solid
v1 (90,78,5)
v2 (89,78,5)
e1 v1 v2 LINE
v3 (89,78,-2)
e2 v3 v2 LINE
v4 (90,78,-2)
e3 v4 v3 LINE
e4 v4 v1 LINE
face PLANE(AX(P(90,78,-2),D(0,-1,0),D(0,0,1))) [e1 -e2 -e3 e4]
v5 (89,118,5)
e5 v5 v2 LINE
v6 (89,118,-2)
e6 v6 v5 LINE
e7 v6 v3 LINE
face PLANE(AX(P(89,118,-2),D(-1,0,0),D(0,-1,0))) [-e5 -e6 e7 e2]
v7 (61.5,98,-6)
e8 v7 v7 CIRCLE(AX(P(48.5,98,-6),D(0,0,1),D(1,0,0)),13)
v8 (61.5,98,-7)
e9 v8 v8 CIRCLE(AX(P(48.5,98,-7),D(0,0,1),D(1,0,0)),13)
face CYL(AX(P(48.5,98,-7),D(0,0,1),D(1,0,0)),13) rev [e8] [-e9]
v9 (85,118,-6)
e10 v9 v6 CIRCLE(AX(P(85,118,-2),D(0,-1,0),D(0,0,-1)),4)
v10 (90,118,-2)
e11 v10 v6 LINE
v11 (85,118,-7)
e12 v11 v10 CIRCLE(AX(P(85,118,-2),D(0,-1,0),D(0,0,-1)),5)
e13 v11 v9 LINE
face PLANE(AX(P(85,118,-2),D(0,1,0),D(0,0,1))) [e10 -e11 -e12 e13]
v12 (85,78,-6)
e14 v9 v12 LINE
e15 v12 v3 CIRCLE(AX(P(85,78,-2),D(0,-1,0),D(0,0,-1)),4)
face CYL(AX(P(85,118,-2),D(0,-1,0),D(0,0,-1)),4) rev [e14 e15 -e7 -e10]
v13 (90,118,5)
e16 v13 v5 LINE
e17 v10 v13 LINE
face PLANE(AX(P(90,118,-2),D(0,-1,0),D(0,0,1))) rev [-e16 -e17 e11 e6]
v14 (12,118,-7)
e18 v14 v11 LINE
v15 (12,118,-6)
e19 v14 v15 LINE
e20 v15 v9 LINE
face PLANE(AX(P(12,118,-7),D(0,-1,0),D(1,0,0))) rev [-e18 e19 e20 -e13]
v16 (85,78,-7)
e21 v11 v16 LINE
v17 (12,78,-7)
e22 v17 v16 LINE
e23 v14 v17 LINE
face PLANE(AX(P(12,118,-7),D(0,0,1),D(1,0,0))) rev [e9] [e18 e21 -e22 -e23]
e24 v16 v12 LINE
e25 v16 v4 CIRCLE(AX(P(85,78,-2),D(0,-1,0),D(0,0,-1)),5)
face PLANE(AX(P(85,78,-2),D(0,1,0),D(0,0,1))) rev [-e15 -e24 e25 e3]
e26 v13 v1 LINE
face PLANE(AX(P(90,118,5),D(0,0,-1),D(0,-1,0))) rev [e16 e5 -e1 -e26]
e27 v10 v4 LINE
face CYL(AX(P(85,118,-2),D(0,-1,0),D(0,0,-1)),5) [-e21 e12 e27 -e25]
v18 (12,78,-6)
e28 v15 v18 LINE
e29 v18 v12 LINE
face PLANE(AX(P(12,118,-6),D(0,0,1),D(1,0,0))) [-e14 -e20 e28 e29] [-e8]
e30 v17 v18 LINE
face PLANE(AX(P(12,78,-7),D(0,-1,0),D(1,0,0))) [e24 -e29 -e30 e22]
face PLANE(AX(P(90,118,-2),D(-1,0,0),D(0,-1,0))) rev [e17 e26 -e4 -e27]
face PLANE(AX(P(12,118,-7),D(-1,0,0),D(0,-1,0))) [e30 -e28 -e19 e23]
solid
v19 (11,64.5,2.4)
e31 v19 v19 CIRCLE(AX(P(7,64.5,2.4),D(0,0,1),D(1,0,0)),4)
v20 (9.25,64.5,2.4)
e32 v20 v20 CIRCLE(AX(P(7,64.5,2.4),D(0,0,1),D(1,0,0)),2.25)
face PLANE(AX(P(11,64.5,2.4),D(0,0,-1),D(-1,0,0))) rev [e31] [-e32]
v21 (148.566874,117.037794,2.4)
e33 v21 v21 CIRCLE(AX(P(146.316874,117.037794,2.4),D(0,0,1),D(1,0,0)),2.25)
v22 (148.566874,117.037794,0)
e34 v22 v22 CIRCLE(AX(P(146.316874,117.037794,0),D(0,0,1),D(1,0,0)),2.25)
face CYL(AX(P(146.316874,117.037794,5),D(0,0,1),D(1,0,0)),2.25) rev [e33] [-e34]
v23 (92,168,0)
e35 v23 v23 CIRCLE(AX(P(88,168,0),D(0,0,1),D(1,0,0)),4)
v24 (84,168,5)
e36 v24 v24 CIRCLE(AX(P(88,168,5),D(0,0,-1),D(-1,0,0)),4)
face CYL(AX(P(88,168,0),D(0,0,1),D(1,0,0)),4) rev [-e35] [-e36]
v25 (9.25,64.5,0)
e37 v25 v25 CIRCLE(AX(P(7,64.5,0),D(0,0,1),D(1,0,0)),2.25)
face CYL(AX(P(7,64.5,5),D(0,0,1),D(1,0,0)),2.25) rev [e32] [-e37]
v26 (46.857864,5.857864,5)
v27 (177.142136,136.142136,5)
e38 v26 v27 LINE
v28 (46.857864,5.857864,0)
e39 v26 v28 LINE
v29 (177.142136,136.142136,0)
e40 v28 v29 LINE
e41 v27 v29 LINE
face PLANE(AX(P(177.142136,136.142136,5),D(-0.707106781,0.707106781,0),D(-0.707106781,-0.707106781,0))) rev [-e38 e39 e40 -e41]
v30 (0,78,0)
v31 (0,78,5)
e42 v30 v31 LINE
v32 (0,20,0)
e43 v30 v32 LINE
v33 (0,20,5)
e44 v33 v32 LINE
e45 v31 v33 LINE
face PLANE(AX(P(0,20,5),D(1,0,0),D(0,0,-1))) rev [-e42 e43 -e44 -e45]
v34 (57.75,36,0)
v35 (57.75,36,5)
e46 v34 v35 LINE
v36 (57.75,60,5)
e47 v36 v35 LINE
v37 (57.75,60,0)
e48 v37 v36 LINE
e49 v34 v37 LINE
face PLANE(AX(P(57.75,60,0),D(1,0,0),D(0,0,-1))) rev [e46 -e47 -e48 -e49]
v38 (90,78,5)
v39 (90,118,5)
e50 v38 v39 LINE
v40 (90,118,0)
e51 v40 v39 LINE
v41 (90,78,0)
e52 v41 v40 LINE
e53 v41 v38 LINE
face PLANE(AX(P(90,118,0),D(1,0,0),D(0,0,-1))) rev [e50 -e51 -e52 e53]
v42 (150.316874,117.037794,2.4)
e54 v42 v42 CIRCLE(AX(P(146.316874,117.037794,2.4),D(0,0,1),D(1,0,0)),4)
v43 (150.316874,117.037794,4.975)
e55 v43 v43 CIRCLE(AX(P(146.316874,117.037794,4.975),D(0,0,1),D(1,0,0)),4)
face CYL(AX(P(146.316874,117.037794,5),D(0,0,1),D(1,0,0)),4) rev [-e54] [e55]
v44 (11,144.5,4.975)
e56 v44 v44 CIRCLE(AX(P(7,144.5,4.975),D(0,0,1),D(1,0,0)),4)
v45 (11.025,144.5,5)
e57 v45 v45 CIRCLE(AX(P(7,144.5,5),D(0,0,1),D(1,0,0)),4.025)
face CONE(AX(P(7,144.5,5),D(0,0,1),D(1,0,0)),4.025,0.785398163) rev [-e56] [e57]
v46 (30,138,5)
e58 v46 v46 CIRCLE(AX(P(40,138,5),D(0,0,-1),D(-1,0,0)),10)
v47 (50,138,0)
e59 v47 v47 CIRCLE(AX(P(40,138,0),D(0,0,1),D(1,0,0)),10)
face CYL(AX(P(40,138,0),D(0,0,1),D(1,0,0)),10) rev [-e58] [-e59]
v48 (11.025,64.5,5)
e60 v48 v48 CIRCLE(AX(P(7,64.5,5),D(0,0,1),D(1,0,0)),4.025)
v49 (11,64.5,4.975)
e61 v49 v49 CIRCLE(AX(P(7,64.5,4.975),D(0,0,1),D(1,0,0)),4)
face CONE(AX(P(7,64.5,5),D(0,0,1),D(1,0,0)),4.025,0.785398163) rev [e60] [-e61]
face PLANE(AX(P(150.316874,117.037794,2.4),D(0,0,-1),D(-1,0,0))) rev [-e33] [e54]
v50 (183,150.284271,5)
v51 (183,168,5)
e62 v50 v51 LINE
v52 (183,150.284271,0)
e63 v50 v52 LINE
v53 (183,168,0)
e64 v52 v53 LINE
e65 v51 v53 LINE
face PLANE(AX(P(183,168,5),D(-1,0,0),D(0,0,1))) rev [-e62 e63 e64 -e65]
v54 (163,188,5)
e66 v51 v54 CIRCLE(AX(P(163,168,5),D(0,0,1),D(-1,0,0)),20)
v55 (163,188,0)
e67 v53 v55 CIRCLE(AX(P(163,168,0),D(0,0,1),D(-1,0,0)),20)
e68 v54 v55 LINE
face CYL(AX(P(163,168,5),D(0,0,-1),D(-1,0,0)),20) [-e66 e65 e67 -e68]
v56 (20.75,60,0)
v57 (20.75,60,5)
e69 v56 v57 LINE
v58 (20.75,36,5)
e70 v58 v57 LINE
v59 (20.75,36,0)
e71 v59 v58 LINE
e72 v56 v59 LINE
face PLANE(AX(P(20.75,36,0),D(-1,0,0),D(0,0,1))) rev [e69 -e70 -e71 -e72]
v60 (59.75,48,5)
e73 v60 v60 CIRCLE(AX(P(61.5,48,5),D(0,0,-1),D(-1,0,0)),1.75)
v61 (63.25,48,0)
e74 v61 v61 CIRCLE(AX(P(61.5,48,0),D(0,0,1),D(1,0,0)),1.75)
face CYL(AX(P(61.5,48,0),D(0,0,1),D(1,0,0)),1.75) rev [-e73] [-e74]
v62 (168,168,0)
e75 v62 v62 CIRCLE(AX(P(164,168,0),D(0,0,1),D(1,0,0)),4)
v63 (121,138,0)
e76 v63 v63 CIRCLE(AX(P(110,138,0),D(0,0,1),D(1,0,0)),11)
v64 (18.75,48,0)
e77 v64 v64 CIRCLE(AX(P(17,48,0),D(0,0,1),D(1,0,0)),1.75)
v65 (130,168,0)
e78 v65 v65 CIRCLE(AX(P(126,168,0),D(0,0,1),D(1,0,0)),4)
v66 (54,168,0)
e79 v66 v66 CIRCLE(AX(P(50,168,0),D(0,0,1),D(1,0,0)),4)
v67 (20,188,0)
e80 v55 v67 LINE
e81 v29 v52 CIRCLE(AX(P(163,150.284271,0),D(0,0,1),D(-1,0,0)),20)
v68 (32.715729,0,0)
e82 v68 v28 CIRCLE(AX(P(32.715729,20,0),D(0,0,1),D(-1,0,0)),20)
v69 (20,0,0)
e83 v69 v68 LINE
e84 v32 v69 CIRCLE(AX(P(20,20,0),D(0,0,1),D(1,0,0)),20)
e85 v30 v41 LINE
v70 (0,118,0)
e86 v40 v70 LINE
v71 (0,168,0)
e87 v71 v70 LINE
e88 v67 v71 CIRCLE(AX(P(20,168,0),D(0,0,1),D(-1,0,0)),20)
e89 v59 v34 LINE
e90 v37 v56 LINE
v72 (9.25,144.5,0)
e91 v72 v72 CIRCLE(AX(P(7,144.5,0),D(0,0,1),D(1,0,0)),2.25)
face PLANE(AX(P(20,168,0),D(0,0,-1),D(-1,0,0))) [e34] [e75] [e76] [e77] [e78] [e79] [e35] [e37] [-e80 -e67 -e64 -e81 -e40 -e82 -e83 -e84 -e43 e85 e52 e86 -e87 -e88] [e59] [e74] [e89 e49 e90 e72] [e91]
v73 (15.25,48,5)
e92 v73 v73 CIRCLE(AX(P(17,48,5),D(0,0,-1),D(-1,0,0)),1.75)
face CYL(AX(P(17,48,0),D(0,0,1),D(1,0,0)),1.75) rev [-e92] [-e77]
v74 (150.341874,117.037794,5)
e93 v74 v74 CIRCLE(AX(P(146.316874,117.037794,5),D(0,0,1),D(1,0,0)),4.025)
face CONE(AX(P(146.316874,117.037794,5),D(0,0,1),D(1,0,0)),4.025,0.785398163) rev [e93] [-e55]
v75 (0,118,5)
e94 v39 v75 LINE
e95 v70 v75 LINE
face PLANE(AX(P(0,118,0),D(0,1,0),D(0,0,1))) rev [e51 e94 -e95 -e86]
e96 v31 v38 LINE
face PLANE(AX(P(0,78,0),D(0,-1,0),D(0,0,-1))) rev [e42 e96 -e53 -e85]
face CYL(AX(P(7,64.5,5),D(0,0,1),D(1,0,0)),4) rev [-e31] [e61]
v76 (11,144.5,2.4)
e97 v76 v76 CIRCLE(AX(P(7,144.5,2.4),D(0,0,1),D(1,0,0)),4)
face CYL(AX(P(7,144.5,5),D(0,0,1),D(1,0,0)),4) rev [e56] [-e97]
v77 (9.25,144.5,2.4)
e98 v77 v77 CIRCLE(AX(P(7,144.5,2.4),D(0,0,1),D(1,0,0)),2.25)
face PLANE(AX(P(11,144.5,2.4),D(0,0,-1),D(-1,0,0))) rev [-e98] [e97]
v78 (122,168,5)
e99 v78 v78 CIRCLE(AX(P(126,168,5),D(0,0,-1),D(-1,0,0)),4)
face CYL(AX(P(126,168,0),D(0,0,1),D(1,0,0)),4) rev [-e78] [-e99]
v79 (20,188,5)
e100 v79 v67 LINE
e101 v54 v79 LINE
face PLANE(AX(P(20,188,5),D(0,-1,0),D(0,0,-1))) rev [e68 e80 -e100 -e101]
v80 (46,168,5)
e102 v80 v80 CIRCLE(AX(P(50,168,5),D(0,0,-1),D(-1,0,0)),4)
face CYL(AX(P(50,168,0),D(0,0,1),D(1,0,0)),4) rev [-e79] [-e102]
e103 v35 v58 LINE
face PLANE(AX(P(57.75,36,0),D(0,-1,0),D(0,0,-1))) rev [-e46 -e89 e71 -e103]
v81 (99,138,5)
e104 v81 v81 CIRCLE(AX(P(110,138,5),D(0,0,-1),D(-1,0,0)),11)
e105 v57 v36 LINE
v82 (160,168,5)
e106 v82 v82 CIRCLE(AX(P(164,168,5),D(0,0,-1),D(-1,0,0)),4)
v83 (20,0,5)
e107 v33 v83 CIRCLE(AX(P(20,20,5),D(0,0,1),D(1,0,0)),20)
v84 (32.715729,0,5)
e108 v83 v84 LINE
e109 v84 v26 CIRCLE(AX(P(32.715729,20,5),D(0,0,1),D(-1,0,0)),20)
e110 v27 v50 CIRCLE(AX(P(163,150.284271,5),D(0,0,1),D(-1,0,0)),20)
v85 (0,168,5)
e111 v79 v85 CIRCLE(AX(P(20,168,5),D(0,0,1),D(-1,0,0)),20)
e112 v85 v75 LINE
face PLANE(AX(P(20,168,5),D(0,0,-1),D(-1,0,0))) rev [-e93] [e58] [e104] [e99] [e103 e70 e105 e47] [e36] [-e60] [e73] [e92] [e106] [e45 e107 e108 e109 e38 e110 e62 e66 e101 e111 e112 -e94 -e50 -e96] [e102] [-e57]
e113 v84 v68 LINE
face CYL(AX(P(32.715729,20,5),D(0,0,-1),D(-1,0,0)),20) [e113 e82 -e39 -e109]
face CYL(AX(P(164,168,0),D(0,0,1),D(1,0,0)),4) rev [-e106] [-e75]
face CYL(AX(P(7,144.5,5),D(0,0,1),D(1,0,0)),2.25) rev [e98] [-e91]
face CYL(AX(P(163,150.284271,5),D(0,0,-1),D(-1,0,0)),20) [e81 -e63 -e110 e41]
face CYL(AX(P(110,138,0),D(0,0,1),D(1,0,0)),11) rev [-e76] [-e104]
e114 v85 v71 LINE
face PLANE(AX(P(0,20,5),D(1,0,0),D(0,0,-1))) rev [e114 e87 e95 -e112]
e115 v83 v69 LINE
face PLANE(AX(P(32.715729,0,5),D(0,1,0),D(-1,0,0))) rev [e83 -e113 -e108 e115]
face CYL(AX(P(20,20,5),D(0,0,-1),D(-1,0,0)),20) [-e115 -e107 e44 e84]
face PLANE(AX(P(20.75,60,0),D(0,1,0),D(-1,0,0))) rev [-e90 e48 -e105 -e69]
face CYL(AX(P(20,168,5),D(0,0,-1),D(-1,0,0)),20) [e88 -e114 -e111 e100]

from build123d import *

# Parameters (mm, degrees)
ESTRUSIONE_ESTRUSIONE1_DEPTH                 = 5
FORO_LAMATO_PER_VITE_M4_A_TESTA_CILI_2_COUNT = 2
FORO_LAMATO_PER_VITE_M4_A_TESTA_CILI_2_PITCH = 80
FORO_LAMATO_PER_VITE_M4_A_TESTA_CILI_3_COUNT = 2
FORO_LAMATO_PER_VITE_M4_A_TESTA_CILI_3_PITCH = 141.997761326
TAGLIO_ESTRUSIONE1_DEPTH                     = 263.408079144
TAGLIO_ESTRUSIONE1_DEPTH_BACK                = 263.408079144
SCHIZZO5_R                                   = 1.75
SCHIZZO5_R_2                                 = 10
SCHIZZO5_R_3                                 = 11
SCHIZZO5_R_4                                 = 4
SCHIZZO5_W                                   = 37
SCHIZZO5_H                                   = 24
TAGLIO_ESTRUSIONE2_DEPTH                     = 263.408079144
TAGLIO_ESTRUSIONE2_DEPTH_BACK                = 263.408079144
SCHIZZO7_W                                   = 90
SCHIZZO7_H                                   = 40
FLANGIA_START                                = 78
FLANGIA_CON_SWEEP3_DEPTH                     = 40
TAGLIO_ESTRUSIONE3_DEPTH                     = 263.59093663
TAGLIO_ESTRUSIONE3_DEPTH_BACK                = 263.59093663
SCHIZZO23_R                                  = 13


# Read off the part's stored shape, not the designer's step: Flangia con sweep3
with BuildPart() as part:
    # Schizzo1 → Estrusione-Estrusione1 (new body)
    with BuildSketch(Plane.XY):
        with BuildLine():
            Line((0, 20), (0, 168))
            ThreePointArc((0, 168), (5.857864376, 182.142135624), (20, 188))
            Line((20, 188), (163, 188))
            ThreePointArc((163, 188), (177.142135624, 182.142135624), (183, 168))
            Line((183, 168), (183, 150.284271247))
            ThreePointArc((183, 150.284271247), (181.47759065, 142.6306026), (177.142135624, 136.142135624))
            Line((177.142135624, 136.142135624), (46.857864376, 5.857864376))
            ThreePointArc((46.857864376, 5.857864376), (40.3693974, 1.52240935), (32.715728753, 0))
            Line((32.715728753, 0), (20, 0))
            ThreePointArc((20, 0), (5.857864376, 5.857864376), (0, 20))
        make_face()
    extrude(amount=ESTRUSIONE_ESTRUSIONE1_DEPTH)

    # Schizzo4 → Foro lamato per Vite M4 a testa cilindrica piana-1 (revolve, cut)
    with BuildSketch(Plane(origin=(7, 144.5, 5), x_dir=(0, -1, 0), z_dir=(1, 0, 0))):
        Polygon((0, 0), (0, 5), (2.25, 5), (2.25, 2.6), (4, 2.6), (4, 0.025), (4.025, 0), align=None)
    foro_lamato_per_vite_m4_a_testa_cilindri = revolve(axis=Axis((7, 144.5, 11.35), (0, 0, -1)), mode=Mode.SUBTRACT)

    # Foro lamato per Vite M4 a testa cili 2: Foro lamato per Vite M4 a testa cilindrica piana-1 ×2
    with Locations(*[(0, -i * FORO_LAMATO_PER_VITE_M4_A_TESTA_CILI_2_PITCH, 0) for i in range(1, FORO_LAMATO_PER_VITE_M4_A_TESTA_CILI_2_COUNT)]):
        add(foro_lamato_per_vite_m4_a_testa_cilindri, mode=Mode.SUBTRACT)

    # Foro lamato per Vite M4 a testa cili 3: Foro lamato per Vite M4 a testa cilindrica piana-1 ×2
    with Locations(*[Vector(0.98112021612507, -0.19339886636352308, 0) * (i * FORO_LAMATO_PER_VITE_M4_A_TESTA_CILI_3_PITCH) for i in range(1, FORO_LAMATO_PER_VITE_M4_A_TESTA_CILI_3_COUNT)]):
        add(foro_lamato_per_vite_m4_a_testa_cilindri, mode=Mode.SUBTRACT)

    # Schizzo5 → Taglio-Estrusione1 (cut, two sides: drawn at the far end of the back side and taken through both)
    with BuildSketch(Plane.XY.offset(5).offset(-TAGLIO_ESTRUSIONE1_DEPTH_BACK)):
        with Locations((17, 48)):
            Circle(SCHIZZO5_R)
        with Locations((61.5, 48)):
            Circle(SCHIZZO5_R)
        with Locations((40, 138)):
            Circle(SCHIZZO5_R_2)
        with Locations((110, 138)):
            Circle(SCHIZZO5_R_3)
        with Locations((50, 168)):
            Circle(SCHIZZO5_R_4)
        with Locations((88, 168)):
            Circle(SCHIZZO5_R_4)
        with Locations((126, 168)):
            Circle(SCHIZZO5_R_4)
        with Locations((164, 168)):
            Circle(SCHIZZO5_R_4)
        with Locations((39.25, 48)):
            Rectangle(SCHIZZO5_W, SCHIZZO5_H)
    extrude(amount=TAGLIO_ESTRUSIONE1_DEPTH + TAGLIO_ESTRUSIONE1_DEPTH_BACK, mode=Mode.SUBTRACT)

    # Schizzo7 → Taglio-Estrusione2 (cut, two sides: drawn at the far end of the back side and taken through both)
    with BuildSketch(Plane.XY.offset(5).offset(-TAGLIO_ESTRUSIONE2_DEPTH_BACK)):
        with Locations((45, 98)):
            Rectangle(SCHIZZO7_W, SCHIZZO7_H)
    extrude(amount=TAGLIO_ESTRUSIONE2_DEPTH + TAGLIO_ESTRUSIONE2_DEPTH_BACK, mode=Mode.SUBTRACT)


with BuildPart() as body_2:
    # Flangia con sweep3 outline → Flangia con sweep3 (new body)
    with BuildSketch(Plane(origin=(0, 0, 0), x_dir=(1, 0, 0), z_dir=(0, 1, 0)).offset(FLANGIA_START)):
        with BuildLine():
            Line((85, 7), (12, 7))
            Line((12, 7), (12, 6))
            Line((12, 6), (85, 6))
            ThreePointArc((85, 6), (87.828427125, 4.828427125), (89, 2))
            Line((89, 2), (89, -5))
            Line((89, -5), (90, -5))
            Line((90, -5), (90, 2))
            ThreePointArc((90, 2), (88.535533906, 5.535533906), (85, 7))
        make_face()
    extrude(amount=FLANGIA_CON_SWEEP3_DEPTH)

    # Schizzo23 → Taglio-Estrusione3 (cut, two sides: drawn at the far end of the back side and taken through both)
    with BuildSketch(Plane.XY.offset(-6).offset(-TAGLIO_ESTRUSIONE3_DEPTH_BACK)):
        with Locations((48.5, 98)):
            Circle(SCHIZZO23_R)
    extrude(amount=TAGLIO_ESTRUSIONE3_DEPTH + TAGLIO_ESTRUSIONE3_DEPTH_BACK, mode=Mode.SUBTRACT)


solid = Compound([part.part, body_2.part])
